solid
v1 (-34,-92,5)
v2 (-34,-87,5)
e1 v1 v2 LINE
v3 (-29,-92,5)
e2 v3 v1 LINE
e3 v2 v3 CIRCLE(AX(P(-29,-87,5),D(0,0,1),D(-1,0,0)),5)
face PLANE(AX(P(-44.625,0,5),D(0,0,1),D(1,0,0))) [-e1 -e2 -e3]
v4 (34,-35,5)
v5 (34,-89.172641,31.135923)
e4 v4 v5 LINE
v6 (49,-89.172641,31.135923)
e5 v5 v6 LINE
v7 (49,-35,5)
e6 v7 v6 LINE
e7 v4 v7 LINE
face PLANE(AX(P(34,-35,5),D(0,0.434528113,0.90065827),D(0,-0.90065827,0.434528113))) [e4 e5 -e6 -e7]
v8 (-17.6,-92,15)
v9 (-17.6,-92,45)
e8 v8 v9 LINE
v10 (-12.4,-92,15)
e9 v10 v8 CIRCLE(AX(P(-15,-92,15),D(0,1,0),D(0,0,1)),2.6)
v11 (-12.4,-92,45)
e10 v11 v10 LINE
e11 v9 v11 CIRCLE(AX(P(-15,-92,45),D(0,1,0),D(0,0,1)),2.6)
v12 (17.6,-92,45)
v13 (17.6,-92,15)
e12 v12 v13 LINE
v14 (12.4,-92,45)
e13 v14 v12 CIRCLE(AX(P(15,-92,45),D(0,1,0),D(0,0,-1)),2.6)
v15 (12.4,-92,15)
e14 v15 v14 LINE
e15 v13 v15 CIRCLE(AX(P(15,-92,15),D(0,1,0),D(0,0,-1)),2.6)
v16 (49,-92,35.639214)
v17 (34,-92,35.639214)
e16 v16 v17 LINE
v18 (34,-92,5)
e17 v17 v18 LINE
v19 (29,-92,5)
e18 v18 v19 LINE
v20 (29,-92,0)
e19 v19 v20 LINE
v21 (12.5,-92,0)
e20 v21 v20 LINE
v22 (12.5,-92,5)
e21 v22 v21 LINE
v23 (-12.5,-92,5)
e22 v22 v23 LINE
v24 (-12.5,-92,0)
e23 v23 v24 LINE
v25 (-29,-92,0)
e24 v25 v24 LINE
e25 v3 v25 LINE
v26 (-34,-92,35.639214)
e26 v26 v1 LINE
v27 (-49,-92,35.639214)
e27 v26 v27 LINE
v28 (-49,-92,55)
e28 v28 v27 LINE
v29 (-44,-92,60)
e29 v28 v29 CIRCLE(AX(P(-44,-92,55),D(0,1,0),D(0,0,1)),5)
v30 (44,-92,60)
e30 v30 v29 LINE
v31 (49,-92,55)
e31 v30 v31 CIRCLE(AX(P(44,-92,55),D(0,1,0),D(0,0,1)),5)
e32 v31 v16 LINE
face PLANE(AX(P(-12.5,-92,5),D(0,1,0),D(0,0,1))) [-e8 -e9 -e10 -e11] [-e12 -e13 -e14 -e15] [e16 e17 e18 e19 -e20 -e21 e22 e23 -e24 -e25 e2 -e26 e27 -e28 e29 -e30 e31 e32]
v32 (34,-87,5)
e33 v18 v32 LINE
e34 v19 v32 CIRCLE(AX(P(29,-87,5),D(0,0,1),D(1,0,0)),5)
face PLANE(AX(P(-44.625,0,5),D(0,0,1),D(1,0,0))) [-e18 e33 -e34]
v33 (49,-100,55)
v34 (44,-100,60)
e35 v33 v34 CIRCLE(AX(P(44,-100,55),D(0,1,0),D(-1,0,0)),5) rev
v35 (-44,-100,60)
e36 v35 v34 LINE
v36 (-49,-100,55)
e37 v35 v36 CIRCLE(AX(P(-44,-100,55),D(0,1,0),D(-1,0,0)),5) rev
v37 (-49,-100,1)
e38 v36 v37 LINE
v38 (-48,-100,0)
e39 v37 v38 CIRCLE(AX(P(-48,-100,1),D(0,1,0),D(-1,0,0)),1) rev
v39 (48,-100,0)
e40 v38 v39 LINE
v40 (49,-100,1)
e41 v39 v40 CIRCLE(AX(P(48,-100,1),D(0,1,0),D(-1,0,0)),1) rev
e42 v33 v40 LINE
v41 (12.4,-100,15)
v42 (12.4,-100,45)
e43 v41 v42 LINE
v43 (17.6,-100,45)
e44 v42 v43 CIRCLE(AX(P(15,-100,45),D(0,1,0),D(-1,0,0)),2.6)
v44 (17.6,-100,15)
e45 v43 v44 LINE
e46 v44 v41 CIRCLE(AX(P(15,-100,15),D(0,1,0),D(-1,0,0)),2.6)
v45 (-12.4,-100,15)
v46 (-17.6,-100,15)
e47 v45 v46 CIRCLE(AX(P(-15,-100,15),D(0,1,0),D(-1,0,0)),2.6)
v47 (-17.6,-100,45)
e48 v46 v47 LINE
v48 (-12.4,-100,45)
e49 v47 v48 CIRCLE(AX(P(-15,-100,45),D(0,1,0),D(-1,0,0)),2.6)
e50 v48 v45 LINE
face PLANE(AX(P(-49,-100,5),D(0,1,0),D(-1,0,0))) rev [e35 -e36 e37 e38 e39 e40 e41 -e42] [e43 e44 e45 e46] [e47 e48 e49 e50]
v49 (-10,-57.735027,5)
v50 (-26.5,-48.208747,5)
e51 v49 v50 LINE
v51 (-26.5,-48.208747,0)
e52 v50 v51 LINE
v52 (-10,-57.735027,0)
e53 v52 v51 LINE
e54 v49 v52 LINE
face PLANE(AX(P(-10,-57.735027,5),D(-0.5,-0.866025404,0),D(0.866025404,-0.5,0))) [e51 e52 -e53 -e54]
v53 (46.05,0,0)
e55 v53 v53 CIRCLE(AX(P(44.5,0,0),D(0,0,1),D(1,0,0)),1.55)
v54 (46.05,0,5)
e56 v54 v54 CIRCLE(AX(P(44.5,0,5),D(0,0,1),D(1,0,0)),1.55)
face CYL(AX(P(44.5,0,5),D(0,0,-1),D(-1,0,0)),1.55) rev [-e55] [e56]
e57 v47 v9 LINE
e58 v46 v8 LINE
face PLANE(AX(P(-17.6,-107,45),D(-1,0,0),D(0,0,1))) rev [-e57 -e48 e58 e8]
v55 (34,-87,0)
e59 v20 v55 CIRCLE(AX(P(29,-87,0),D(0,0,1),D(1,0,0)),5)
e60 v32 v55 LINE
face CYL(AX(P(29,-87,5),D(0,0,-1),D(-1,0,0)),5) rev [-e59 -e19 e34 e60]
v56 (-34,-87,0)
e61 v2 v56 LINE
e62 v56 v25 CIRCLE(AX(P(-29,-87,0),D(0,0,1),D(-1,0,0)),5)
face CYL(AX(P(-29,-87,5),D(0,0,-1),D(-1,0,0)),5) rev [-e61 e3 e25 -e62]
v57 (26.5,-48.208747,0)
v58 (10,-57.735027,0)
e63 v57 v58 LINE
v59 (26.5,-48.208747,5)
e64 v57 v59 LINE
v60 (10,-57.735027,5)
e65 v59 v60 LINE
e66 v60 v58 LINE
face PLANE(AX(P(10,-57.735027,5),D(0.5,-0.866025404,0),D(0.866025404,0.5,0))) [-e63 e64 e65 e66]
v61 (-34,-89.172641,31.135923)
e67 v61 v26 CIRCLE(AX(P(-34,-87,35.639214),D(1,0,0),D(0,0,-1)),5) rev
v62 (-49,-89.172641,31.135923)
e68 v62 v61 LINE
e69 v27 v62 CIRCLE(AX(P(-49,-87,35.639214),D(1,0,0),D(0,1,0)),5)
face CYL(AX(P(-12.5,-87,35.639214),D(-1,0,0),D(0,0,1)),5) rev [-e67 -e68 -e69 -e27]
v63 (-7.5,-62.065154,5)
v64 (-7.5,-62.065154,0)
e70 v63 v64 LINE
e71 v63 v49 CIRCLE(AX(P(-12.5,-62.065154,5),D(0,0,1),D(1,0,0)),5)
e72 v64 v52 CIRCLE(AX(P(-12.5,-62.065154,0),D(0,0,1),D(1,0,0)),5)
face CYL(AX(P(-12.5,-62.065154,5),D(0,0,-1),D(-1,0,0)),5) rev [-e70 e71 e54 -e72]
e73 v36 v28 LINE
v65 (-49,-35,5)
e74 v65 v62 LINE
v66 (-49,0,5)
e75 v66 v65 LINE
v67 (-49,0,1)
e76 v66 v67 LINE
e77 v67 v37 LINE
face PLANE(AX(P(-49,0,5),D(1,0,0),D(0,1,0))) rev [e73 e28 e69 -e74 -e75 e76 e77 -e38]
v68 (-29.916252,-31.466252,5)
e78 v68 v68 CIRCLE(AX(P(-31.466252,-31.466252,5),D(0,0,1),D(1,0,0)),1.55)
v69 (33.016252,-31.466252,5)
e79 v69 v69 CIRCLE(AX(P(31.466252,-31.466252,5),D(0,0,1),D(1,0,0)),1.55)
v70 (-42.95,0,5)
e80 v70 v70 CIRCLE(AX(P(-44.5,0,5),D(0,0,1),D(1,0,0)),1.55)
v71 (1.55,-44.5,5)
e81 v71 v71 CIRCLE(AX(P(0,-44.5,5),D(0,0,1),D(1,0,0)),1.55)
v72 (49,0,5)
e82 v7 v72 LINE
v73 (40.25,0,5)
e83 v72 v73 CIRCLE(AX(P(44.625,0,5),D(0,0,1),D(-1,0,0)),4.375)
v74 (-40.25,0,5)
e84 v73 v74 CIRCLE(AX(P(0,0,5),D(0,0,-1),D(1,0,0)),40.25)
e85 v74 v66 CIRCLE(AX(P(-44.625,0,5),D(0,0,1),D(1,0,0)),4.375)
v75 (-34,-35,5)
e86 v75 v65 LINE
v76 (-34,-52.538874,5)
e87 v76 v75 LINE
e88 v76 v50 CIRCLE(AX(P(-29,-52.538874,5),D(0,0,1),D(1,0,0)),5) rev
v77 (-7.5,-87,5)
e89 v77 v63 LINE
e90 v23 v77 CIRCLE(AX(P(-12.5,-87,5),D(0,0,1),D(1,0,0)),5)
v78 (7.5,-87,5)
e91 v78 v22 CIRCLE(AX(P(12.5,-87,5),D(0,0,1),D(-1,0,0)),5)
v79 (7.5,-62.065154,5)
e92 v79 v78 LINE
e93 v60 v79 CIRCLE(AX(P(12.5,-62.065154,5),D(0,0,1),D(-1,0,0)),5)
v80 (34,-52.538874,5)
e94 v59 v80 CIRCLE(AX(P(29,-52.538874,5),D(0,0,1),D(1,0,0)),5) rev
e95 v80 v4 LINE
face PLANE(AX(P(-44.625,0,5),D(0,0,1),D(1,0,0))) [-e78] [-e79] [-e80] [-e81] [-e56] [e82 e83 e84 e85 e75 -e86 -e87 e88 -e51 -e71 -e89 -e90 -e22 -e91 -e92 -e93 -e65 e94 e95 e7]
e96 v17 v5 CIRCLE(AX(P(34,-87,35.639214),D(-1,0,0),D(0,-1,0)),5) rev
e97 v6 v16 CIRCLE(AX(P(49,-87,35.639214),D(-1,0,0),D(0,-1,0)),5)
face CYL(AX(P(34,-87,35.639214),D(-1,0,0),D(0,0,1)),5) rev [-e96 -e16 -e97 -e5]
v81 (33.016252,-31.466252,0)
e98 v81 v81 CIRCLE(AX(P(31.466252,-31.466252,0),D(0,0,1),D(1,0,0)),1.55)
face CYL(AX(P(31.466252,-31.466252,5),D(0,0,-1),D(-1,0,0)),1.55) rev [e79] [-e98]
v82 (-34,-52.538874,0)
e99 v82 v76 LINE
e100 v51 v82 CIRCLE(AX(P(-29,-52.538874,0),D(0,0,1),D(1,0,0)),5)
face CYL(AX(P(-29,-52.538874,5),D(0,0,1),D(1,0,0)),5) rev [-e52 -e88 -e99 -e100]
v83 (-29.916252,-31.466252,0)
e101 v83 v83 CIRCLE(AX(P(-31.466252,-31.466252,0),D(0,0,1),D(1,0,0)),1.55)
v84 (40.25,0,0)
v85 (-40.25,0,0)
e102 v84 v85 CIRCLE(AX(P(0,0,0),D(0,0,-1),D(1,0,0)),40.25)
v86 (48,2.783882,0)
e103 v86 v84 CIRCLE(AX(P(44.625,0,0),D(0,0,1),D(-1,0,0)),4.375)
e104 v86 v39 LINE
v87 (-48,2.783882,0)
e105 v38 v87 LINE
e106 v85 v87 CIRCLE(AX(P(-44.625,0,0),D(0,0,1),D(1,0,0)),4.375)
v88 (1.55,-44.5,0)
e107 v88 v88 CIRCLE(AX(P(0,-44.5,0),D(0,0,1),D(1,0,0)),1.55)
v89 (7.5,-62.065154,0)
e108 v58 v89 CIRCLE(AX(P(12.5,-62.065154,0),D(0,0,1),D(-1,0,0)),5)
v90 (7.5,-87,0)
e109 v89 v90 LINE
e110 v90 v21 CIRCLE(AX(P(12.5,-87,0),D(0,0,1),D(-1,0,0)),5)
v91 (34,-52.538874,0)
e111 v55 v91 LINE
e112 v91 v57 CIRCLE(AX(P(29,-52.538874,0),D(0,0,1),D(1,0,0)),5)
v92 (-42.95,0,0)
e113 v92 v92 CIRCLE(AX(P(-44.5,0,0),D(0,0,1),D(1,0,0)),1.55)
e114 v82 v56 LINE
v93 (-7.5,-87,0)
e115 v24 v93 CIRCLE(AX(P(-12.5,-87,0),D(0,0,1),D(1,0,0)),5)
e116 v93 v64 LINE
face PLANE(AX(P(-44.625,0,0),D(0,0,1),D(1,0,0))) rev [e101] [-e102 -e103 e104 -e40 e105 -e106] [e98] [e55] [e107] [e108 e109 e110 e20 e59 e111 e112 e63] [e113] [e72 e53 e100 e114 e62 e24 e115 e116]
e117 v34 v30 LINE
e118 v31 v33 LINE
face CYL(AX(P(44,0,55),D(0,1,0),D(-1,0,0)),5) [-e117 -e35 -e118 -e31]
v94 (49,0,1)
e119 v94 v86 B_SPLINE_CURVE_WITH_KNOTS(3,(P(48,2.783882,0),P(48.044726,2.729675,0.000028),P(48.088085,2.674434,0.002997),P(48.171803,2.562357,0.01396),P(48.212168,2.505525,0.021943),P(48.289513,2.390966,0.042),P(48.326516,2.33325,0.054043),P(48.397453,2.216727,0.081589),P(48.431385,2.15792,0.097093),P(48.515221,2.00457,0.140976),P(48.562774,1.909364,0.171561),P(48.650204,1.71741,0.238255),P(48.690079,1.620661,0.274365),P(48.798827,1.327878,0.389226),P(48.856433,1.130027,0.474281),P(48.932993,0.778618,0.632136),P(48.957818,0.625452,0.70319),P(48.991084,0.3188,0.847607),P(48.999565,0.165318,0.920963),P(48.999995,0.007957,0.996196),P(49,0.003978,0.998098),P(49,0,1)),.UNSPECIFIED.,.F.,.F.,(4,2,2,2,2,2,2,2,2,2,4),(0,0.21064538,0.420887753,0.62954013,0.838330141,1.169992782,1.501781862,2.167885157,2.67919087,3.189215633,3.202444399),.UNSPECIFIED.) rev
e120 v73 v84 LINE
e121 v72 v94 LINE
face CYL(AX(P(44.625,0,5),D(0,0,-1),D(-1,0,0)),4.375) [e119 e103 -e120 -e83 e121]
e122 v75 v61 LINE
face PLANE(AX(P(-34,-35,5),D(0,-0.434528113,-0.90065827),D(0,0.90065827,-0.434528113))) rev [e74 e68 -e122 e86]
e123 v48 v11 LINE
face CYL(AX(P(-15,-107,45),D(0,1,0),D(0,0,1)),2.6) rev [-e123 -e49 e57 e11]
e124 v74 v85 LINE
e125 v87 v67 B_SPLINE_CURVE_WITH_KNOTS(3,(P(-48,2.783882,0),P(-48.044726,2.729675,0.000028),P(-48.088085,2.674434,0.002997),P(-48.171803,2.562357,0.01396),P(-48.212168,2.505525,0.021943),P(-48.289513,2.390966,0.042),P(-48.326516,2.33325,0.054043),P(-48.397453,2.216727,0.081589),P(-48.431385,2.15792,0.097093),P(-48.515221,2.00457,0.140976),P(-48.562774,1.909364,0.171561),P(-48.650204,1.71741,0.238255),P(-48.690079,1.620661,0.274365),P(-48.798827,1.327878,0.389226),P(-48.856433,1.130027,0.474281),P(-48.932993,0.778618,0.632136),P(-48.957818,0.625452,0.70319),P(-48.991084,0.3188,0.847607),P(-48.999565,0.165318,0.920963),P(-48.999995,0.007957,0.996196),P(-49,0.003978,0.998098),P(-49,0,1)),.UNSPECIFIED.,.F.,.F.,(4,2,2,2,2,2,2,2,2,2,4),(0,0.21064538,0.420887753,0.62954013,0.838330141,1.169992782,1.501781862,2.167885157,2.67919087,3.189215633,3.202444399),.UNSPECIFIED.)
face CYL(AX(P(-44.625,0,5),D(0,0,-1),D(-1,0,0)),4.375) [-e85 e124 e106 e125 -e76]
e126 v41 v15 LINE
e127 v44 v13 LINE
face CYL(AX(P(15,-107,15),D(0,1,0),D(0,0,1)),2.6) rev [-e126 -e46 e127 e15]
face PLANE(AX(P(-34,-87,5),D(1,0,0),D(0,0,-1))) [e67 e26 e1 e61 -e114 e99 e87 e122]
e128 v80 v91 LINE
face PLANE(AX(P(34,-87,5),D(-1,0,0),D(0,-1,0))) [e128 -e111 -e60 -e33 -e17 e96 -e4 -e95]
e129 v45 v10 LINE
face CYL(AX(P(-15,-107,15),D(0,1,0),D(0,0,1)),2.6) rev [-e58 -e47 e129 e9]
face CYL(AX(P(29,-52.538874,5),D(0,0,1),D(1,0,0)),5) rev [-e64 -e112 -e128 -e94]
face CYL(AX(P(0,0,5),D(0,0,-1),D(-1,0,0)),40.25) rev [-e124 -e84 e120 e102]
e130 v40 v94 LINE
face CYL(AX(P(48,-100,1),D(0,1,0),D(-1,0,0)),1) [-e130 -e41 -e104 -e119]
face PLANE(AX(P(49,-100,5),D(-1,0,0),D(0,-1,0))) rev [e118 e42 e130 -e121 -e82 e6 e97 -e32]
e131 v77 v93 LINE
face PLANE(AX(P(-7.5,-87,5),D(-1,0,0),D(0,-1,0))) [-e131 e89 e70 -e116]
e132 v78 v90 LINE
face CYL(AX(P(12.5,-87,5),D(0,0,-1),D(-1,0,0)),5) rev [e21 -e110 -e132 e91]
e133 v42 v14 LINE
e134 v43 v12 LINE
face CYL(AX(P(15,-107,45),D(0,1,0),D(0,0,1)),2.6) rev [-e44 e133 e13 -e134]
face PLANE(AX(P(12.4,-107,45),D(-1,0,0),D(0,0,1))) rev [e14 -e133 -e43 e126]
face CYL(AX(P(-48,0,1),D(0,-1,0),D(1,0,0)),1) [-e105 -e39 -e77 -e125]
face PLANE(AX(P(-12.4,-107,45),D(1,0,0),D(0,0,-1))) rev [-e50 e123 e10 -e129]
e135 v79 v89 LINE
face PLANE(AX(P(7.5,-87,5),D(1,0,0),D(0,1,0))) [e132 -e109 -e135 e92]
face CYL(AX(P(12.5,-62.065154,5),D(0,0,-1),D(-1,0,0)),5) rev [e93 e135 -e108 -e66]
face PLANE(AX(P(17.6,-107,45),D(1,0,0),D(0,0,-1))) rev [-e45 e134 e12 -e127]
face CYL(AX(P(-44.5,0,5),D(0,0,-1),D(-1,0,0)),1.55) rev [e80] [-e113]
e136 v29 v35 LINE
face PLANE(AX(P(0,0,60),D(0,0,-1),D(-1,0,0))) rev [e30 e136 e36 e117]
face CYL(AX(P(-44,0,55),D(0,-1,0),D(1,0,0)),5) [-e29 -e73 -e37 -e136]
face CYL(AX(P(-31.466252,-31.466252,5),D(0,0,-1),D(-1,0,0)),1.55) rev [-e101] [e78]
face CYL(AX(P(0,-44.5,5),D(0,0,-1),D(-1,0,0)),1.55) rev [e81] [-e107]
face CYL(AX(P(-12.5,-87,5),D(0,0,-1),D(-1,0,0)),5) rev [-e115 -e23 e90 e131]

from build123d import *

# Parameters (mm, degrees)
SKETCH1_R           = 1.55
BOSS_EXTRUDE1_DEPTH = 5
SKETCH2_W           = 98
SKETCH2_H           = 8
BOSS_EXTRUDE2_DEPTH = 55
BOSS_EXTRUDE3_DEPTH = 15
FILLET2_R           = 5
CUT_EXTRUDE1_DEPTH  = 15
FILLET3_R           = 1


with BuildPart() as part:
    # Sketch1 → Boss-Extrude1 (new body)
    with BuildSketch(Plane.XY):
        with BuildLine():
            Line((-49, 0), (-49, -100))
            Line((-49, -100), (49, -100))
            Line((49, -100), (49, 0))
            ThreePointArc((49, 0), (44.625, 4.375), (40.25, 0))
            ThreePointArc((40.25, 0), (0, -40.25), (-40.25, 0))
            ThreePointArc((-40.25, 0), (-44.625, 4.375), (-49, 0))
        make_face()
        with Locations((0, -44.5)):
            Circle(SKETCH1_R, mode=Mode.SUBTRACT)
        with Locations((-31.466251763, -31.466251763)):
            Circle(SKETCH1_R, mode=Mode.SUBTRACT)
        with Locations((-44.5, 0)):
            Circle(SKETCH1_R, mode=Mode.SUBTRACT)
        with Locations((44.5, 0)):
            Circle(SKETCH1_R, mode=Mode.SUBTRACT)
        with Locations((31.466251763, -31.466251763)):
            Circle(SKETCH1_R, mode=Mode.SUBTRACT)
        with BuildLine():
            Line((-12.5, -92), (-29, -92))
            ThreePointArc((-29, -92), (-32.535533906, -90.535533906), (-34, -87))
            Line((-34, -87), (-34, -43.878620458))
            Line((-34, -43.878620458), (-10, -57.735026919))
            ThreePointArc((-10, -57.735026919), (-8.169872981, -59.565153938), (-7.5, -62.065153938))
            Line((-7.5, -62.065153938), (-7.5, -87))
            ThreePointArc((-7.5, -87), (-8.964466094, -90.535533906), (-12.5, -92))
        make_face(mode=Mode.SUBTRACT)
        with BuildLine():
            Line((10, -57.735026919), (34, -43.878620458))
            Line((34, -43.878620458), (34, -87))
            ThreePointArc((34, -87), (32.535533906, -90.535533906), (29, -92))
            Line((29, -92), (12.5, -92))
            ThreePointArc((12.5, -92), (8.964466094, -90.535533906), (7.5, -87))
            Line((7.5, -87), (7.5, -62.065153938))
            ThreePointArc((7.5, -62.065153938), (8.169872981, -59.565153938), (10, -57.735026919))
        make_face(mode=Mode.SUBTRACT)
    extrude(amount=BOSS_EXTRUDE1_DEPTH)

    # Sketch2 → Boss-Extrude2 (add)
    with BuildSketch(Plane.XY.offset(5)):
        with Locations((0, -96)):
            Rectangle(SKETCH2_W, SKETCH2_H)
    extrude(amount=BOSS_EXTRUDE2_DEPTH)

    # Sketch3 → Boss-Extrude3 (add)
    with BuildSketch(Plane(origin=(49, 0, 0), x_dir=(0, 0, -1), z_dir=(1, 0, 0))):
        Polygon((-5, -35), (-32.5, -92), (-5, -92), align=None)
    boss_extrude3 = extrude(amount=-BOSS_EXTRUDE3_DEPTH)

    # Mirror1: Boss-Extrude3 across plane
    add(boss_extrude3.mirror(Plane(origin=(0, 0, 0), x_dir=(0, 0, 1), z_dir=(1, 0, 0))))

    # Fillet2
    fillet2_edges = [part.edges().sort_by_distance(p)[0] for p in [
        (41.5, -92, 32.5),
        (-41.5, -92, 32.5),
        (-34, -43.878620458, 2.5),
        (34, -43.878620458, 2.5),
        (-49, -96, 60),
        (49, -96, 60),
    ]]
    fillet(fillet2_edges, radius=FILLET2_R)

    # Sketch4 → Cut-Extrude1 (cut)
    with BuildSketch(Plane(origin=(0, -92, 0), x_dir=(1, 0, 0), z_dir=(0, 1, 0))):
        with BuildLine():
            Line((-17.6, -45), (-17.6, -15))
            ThreePointArc((-17.6, -15), (-15, -12.4), (-12.4, -15))
            Line((-12.4, -15), (-12.4, -45))
            ThreePointArc((-12.4, -45), (-15, -47.6), (-17.6, -45))
        make_face()
        with BuildLine():
            Line((17.6, -45), (17.6, -15))
            ThreePointArc((17.6, -15), (15, -12.4), (12.4, -15))
            Line((12.4, -15), (12.4, -45))
            ThreePointArc((12.4, -45), (15, -47.6), (17.6, -45))
        make_face()
    extrude(amount=-CUT_EXTRUDE1_DEPTH, mode=Mode.SUBTRACT)

    # Fillet3
    # the kernel refuses this fillet: 1 mm, written as the material it takes off along each edge
    with BuildSketch(Plane(origin=(49, -106, 0), x_dir=(-1, 0, 0), z_dir=(0, 1, 0))) as fillet3_piece_1:
        with BuildLine():
            CenterArc((FILLET3_R, FILLET3_R), FILLET3_R, 180, 90)
            Line((0, FILLET3_R), (-FILLET3_R * 0.02, FILLET3_R))
            Line((-FILLET3_R * 0.02, FILLET3_R), (-FILLET3_R * 0.02, -FILLET3_R * 0.02))
            Line((-FILLET3_R * 0.02, -FILLET3_R * 0.02), (FILLET3_R, -FILLET3_R * 0.02))
            Line((FILLET3_R, -FILLET3_R * 0.02), (FILLET3_R, 0))
        make_face()
    extrude(amount=112, mode=Mode.SUBTRACT)
    with BuildSketch(Plane(origin=(-49, 6, 0), x_dir=(0, 0, 1), z_dir=(0, -1, 0))) as fillet3_piece_2:
        with BuildLine():
            CenterArc((FILLET3_R, -FILLET3_R), FILLET3_R, 90, 90)
            Line((0, -FILLET3_R), (-FILLET3_R * 0.02, -FILLET3_R))
            Line((-FILLET3_R * 0.02, -FILLET3_R), (-FILLET3_R * 0.02, FILLET3_R * 0.02))
            Line((-FILLET3_R * 0.02, FILLET3_R * 0.02), (FILLET3_R, FILLET3_R * 0.02))
            Line((FILLET3_R, FILLET3_R * 0.02), (FILLET3_R, 0))
        make_face()
    extrude(amount=112, mode=Mode.SUBTRACT)


solid = part.part
